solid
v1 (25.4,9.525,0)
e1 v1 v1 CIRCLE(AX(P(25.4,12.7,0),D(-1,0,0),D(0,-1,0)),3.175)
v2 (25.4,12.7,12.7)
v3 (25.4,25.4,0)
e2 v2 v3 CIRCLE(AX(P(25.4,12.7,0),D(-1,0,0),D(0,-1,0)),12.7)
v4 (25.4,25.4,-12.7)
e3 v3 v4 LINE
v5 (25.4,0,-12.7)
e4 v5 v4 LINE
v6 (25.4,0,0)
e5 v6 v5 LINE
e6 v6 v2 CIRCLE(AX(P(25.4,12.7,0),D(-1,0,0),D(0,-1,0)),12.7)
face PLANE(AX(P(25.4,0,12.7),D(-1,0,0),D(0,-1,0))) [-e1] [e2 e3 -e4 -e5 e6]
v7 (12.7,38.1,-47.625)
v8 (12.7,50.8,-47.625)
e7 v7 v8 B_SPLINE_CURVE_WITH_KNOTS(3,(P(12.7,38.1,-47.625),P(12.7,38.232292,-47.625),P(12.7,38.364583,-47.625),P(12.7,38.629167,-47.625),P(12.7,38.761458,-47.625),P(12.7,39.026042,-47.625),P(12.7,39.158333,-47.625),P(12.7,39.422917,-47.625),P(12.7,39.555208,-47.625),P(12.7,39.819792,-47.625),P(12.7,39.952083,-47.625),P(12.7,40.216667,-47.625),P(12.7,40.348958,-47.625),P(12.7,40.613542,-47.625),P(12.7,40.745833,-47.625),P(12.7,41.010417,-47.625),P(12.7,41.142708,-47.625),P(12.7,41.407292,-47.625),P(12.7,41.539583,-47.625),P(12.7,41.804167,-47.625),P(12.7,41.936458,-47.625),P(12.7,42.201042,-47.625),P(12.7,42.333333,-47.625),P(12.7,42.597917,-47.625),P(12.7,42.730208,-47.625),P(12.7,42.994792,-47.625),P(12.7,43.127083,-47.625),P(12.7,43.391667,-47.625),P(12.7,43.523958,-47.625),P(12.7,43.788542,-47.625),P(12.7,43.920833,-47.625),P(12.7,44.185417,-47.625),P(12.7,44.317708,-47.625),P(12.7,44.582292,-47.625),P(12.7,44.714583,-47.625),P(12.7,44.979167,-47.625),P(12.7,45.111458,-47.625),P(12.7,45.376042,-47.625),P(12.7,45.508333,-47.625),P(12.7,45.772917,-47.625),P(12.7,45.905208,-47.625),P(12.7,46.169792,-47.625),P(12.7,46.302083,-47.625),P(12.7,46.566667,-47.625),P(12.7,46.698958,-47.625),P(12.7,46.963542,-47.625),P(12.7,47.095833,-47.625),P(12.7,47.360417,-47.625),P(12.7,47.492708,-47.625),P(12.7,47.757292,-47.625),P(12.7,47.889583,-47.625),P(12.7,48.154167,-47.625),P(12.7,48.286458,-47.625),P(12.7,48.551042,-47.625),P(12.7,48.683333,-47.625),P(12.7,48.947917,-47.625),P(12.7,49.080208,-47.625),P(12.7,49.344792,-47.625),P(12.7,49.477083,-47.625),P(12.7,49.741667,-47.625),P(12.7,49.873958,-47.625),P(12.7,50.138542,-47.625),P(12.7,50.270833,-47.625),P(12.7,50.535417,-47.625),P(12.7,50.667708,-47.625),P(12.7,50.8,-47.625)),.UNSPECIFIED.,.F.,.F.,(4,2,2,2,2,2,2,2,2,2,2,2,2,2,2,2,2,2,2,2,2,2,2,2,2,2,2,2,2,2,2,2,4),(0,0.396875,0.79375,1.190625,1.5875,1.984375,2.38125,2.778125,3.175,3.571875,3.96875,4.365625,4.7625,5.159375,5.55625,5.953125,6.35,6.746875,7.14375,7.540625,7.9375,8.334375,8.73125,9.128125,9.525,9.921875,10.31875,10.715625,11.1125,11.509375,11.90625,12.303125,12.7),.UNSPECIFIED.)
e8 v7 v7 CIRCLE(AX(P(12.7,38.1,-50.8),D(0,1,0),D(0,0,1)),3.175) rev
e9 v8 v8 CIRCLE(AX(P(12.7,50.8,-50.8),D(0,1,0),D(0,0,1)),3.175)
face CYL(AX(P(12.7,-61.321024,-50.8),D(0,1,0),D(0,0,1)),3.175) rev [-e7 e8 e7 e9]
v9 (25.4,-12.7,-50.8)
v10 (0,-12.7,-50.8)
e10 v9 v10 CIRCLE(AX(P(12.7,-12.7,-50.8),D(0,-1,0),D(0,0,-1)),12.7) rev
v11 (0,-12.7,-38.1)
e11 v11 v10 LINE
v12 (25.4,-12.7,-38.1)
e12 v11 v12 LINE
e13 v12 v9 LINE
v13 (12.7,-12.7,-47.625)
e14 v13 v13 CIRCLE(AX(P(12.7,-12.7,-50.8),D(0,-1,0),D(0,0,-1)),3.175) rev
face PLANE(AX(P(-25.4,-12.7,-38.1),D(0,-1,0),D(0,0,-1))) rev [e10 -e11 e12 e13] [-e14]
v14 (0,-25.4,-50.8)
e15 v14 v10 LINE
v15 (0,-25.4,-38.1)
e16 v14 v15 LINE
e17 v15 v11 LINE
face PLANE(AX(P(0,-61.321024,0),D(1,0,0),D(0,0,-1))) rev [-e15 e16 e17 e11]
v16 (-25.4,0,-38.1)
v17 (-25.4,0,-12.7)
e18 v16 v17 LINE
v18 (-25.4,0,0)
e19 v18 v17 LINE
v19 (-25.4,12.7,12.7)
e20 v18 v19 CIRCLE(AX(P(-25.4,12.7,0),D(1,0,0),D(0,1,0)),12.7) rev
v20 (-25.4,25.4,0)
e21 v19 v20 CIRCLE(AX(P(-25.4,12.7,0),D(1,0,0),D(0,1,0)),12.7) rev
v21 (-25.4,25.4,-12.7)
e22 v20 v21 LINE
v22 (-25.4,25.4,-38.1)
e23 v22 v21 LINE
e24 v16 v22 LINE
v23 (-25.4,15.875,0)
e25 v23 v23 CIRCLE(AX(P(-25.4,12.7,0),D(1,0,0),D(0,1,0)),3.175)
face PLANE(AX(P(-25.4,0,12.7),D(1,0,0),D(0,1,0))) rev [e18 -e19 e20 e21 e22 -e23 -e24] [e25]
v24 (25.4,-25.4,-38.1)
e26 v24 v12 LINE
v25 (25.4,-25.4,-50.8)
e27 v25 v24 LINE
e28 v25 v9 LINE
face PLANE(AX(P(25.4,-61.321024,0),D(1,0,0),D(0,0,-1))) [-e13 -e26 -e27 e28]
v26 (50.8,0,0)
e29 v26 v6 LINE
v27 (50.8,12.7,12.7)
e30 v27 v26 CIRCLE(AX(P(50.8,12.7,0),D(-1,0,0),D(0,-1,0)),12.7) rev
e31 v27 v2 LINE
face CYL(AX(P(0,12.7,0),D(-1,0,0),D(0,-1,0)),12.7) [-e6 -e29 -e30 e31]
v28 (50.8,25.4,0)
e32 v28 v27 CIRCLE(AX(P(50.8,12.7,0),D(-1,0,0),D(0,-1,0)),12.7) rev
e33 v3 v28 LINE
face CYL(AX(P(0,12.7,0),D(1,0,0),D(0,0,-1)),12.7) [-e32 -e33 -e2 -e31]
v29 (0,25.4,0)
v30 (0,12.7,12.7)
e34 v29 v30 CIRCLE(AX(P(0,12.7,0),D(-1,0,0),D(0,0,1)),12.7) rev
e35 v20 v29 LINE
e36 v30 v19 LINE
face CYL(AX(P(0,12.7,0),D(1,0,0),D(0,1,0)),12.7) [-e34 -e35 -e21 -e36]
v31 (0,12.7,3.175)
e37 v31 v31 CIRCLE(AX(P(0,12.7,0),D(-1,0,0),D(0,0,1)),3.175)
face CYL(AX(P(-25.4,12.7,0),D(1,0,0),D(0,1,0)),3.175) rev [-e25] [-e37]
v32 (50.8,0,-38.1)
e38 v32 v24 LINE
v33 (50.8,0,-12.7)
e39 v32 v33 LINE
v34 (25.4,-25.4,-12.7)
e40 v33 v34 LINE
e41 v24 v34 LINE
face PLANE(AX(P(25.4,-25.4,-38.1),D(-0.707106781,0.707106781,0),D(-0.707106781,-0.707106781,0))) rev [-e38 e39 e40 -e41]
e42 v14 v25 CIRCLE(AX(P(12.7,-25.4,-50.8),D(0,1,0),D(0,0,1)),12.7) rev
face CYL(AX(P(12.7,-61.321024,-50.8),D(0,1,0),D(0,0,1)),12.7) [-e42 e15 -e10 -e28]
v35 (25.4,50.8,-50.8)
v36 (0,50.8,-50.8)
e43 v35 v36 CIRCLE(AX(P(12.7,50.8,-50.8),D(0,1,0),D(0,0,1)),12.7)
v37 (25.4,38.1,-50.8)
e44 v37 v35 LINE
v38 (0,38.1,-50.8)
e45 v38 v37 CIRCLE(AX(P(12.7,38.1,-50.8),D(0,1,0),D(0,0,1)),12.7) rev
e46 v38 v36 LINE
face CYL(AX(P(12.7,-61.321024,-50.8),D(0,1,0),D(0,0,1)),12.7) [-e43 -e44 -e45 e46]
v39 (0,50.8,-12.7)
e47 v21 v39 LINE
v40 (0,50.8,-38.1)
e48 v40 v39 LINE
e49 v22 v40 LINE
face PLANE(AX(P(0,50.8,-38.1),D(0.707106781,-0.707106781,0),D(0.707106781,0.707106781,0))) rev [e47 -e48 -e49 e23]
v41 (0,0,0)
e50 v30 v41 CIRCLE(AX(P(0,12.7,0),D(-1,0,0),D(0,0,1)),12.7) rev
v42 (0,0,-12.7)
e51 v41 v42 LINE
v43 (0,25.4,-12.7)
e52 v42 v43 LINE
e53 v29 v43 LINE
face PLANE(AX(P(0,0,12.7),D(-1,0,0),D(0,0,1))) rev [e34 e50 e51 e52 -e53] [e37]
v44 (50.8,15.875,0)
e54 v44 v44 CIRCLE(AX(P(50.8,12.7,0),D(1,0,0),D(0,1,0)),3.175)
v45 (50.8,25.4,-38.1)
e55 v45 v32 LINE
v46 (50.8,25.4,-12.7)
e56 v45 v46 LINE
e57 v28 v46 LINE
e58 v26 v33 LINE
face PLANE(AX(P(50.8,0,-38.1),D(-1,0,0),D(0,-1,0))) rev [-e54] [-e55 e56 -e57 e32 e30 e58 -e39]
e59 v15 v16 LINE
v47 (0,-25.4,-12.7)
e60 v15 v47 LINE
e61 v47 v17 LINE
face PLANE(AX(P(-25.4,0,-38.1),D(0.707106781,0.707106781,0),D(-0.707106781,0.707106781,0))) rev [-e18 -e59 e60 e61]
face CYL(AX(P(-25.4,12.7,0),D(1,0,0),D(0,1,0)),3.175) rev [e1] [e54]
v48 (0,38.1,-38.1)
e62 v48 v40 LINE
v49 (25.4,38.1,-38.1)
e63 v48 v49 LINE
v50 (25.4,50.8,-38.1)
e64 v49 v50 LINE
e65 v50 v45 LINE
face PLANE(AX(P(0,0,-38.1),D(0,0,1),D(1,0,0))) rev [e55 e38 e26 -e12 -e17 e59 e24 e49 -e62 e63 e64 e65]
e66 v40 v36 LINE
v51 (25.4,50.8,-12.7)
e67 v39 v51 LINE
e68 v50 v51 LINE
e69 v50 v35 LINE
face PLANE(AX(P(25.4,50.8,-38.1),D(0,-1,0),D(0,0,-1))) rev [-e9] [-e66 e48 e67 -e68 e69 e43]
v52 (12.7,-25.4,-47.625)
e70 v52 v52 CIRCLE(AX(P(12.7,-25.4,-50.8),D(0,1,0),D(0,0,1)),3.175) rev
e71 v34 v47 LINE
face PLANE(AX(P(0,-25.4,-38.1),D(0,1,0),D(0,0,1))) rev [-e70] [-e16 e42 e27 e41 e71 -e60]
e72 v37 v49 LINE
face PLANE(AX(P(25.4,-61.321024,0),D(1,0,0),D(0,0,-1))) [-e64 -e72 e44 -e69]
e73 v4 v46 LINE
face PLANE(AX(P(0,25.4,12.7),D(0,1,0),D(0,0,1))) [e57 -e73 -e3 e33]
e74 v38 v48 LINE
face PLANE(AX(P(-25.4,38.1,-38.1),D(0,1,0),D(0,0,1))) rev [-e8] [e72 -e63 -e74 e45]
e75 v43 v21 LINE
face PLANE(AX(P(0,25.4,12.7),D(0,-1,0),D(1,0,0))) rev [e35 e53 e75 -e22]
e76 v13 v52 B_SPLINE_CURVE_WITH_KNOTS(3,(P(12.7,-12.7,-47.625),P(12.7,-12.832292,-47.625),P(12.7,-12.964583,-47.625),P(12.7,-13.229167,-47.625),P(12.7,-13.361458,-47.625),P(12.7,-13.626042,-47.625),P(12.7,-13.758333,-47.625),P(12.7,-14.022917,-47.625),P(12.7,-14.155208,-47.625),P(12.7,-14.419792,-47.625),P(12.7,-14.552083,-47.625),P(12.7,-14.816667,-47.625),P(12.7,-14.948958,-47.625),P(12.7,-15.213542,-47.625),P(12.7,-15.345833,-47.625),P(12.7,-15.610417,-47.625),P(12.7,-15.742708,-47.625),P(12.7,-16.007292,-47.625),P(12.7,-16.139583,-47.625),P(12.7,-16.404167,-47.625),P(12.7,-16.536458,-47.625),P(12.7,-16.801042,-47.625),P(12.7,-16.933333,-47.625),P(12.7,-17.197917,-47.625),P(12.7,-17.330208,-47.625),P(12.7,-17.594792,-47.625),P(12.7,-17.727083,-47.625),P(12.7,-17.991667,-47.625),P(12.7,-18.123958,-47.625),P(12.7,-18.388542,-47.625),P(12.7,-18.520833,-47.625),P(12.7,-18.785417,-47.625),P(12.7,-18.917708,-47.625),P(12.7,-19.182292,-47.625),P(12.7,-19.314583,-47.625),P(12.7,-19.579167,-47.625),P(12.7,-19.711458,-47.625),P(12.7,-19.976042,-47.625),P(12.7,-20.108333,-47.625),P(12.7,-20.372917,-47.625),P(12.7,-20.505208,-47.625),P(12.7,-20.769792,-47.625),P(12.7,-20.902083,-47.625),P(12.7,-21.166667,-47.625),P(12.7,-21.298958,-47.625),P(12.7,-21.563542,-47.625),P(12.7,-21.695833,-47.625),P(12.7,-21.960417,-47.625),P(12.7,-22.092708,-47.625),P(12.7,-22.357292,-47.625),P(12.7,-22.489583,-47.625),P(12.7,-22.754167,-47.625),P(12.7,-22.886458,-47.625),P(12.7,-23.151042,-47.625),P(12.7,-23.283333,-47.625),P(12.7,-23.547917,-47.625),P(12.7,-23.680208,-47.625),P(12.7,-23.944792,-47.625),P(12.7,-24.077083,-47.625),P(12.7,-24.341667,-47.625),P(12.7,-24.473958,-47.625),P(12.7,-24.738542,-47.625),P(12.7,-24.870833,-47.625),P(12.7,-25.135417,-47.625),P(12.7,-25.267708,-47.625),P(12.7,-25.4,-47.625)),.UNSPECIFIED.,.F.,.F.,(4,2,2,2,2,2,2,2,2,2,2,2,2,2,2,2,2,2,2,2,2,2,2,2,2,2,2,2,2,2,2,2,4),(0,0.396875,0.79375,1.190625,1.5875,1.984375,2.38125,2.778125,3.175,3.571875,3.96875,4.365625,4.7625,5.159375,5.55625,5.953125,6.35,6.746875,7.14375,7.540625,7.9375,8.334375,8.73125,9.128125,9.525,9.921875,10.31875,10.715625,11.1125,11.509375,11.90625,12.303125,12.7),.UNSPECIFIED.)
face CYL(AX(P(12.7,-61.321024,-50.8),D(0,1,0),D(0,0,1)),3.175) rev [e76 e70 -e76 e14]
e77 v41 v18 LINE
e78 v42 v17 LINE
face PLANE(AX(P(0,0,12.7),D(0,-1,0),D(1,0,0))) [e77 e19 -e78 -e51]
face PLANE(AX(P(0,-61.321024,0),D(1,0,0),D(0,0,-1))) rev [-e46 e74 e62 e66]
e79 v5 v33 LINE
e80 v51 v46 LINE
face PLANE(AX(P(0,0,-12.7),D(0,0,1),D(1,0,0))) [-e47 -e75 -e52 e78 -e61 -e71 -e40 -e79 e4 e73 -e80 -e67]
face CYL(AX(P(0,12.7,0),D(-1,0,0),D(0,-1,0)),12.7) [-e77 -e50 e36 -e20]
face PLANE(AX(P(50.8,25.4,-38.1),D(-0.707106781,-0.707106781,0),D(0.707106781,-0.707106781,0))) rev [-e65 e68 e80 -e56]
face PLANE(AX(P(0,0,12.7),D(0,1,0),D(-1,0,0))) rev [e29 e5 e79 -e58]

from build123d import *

# Parameters (mm, degrees)
SKETCH1_W             = 25.4
SKETCH1_H             = 25.4
BOSS_EXTRUDE1_DEPTH   = 12.7
BOSS_EXTRUDE1_2_DEPTH = 12.7
BOSS_EXTRUDE2_DEPTH   = 25.4
SKETCH3_R             = 3.175
CUT_EXTRUDE1_DEPTH    = 100.190170884
FILLET1_R             = 12.7
BOSS_EXTRUDE3_DEPTH   = 76.2
SKETCH5_W             = 25.4
SKETCH5_H             = 50.8
CUT_EXTRUDE2_DEPTH    = 96.882897328


with BuildPart() as part:
    # Sketch1 → Boss-Extrude1 (new, symmetric)
    with BuildSketch(Plane.XY):
        with Locations((-12.7, 12.7)):
            Rectangle(SKETCH1_W, SKETCH1_H)
    extrude(amount=BOSS_EXTRUDE1_DEPTH, both=True)



with BuildPart() as body_2:
    # Sketch1 → Boss-Extrude1 2 (new, symmetric)
    with BuildSketch(Plane.XY):
        with Locations((38.1, 12.7)):
            Rectangle(SKETCH1_W, SKETCH1_H)
    extrude(amount=BOSS_EXTRUDE1_2_DEPTH, both=True)


with BuildPart() as part_1:
    add(part.part)

    add(body_2.part)  # Boss-Extrude2 merges body 2
    # Sketch2 → Boss-Extrude2 (add)
    with BuildSketch(Plane(origin=(0, 0, -12.7), x_dir=(-1, 0, 0), z_dir=(0, 0, -1))):
        Polygon((-50.8, 25.4), (-25.4, 50.8), (0, 50.8), (25.4, 25.4), (25.4, 0), (0, -25.4), (-25.4, -25.4), (-50.8, 0), align=None)
    extrude(amount=BOSS_EXTRUDE2_DEPTH)

    # Sketch3 → Cut-Extrude1 (cut, through all)
    with BuildSketch(Plane(origin=(50.8, 0, 0), x_dir=(0, 0, -1), z_dir=(1, 0, 0))):
        with Locations(Location((0, 12.7, 0), (0, 0, 90))):
            Circle(SKETCH3_R)
    extrude(amount=-CUT_EXTRUDE1_DEPTH, mode=Mode.SUBTRACT)

    # Fillet1
    fillet1_edges = [part_1.edges().sort_by_distance(p)[0] for p in [
        (38.1, 0, 12.7),
        (-12.7, 0, 12.7),
        (-12.7, 25.4, 12.7),
        (38.1, 25.4, 12.7),
    ]]
    fillet(fillet1_edges, radius=FILLET1_R - 0.0001)  # a hair under: the kernel refuses the full size

    # Sketch4 → Boss-Extrude3 (add)
    with BuildSketch(Plane(origin=(0, 50.8, 0), x_dir=(1, 0, 0), z_dir=(0, 1, 0))):
        with BuildLine():
            ThreePointArc((0, 50.8), (3.719743896, 41.819743862), (12.700000049, 38.1))
            ThreePointArc((12.700000049, 38.1), (21.680256138, 41.819743896), (25.4, 50.8))
            Line((25.4, 50.8), (15.875, 50.8))
            ThreePointArc((15.875, 50.8), (12.7, 47.625), (9.525, 50.8))
            Line((9.525, 50.8), (0, 50.8))
        make_face()
        with BuildLine():
            ThreePointArc((25.4, 50.8), (12.7, 63.5), (0, 50.8))
            Line((0, 50.8), (9.525, 50.8))
            ThreePointArc((9.525, 50.8), (12.7, 53.975), (15.875, 50.8))
            Line((15.875, 50.8), (25.4, 50.8))
        make_face()
        with BuildLine():
            Line((0, 50.8), (0, 38.1))
            Line((0, 38.1), (12.700000049, 38.1))
            ThreePointArc((12.700000049, 38.1), (3.719743896, 41.819743862), (0, 50.8))
        make_face()
        with BuildLine():
            ThreePointArc((25.4, 50.8), (21.680256138, 41.819743896), (12.700000049, 38.1))
            Line((12.700000049, 38.1), (25.4, 38.1))
            Line((25.4, 38.1), (25.4, 50.8))
        make_face()
    extrude(amount=-BOSS_EXTRUDE3_DEPTH)

    # Sketch5 → Cut-Extrude2 (cut, through all)
    with BuildSketch(Plane(origin=(25.4, 0, 0), x_dir=(0, 0, -1), z_dir=(1, 0, 0))):
        with Locations((50.8, 12.7)):
            Rectangle(SKETCH5_W, SKETCH5_H)
    extrude(amount=-CUT_EXTRUDE2_DEPTH, mode=Mode.SUBTRACT)


solid = part_1.part
